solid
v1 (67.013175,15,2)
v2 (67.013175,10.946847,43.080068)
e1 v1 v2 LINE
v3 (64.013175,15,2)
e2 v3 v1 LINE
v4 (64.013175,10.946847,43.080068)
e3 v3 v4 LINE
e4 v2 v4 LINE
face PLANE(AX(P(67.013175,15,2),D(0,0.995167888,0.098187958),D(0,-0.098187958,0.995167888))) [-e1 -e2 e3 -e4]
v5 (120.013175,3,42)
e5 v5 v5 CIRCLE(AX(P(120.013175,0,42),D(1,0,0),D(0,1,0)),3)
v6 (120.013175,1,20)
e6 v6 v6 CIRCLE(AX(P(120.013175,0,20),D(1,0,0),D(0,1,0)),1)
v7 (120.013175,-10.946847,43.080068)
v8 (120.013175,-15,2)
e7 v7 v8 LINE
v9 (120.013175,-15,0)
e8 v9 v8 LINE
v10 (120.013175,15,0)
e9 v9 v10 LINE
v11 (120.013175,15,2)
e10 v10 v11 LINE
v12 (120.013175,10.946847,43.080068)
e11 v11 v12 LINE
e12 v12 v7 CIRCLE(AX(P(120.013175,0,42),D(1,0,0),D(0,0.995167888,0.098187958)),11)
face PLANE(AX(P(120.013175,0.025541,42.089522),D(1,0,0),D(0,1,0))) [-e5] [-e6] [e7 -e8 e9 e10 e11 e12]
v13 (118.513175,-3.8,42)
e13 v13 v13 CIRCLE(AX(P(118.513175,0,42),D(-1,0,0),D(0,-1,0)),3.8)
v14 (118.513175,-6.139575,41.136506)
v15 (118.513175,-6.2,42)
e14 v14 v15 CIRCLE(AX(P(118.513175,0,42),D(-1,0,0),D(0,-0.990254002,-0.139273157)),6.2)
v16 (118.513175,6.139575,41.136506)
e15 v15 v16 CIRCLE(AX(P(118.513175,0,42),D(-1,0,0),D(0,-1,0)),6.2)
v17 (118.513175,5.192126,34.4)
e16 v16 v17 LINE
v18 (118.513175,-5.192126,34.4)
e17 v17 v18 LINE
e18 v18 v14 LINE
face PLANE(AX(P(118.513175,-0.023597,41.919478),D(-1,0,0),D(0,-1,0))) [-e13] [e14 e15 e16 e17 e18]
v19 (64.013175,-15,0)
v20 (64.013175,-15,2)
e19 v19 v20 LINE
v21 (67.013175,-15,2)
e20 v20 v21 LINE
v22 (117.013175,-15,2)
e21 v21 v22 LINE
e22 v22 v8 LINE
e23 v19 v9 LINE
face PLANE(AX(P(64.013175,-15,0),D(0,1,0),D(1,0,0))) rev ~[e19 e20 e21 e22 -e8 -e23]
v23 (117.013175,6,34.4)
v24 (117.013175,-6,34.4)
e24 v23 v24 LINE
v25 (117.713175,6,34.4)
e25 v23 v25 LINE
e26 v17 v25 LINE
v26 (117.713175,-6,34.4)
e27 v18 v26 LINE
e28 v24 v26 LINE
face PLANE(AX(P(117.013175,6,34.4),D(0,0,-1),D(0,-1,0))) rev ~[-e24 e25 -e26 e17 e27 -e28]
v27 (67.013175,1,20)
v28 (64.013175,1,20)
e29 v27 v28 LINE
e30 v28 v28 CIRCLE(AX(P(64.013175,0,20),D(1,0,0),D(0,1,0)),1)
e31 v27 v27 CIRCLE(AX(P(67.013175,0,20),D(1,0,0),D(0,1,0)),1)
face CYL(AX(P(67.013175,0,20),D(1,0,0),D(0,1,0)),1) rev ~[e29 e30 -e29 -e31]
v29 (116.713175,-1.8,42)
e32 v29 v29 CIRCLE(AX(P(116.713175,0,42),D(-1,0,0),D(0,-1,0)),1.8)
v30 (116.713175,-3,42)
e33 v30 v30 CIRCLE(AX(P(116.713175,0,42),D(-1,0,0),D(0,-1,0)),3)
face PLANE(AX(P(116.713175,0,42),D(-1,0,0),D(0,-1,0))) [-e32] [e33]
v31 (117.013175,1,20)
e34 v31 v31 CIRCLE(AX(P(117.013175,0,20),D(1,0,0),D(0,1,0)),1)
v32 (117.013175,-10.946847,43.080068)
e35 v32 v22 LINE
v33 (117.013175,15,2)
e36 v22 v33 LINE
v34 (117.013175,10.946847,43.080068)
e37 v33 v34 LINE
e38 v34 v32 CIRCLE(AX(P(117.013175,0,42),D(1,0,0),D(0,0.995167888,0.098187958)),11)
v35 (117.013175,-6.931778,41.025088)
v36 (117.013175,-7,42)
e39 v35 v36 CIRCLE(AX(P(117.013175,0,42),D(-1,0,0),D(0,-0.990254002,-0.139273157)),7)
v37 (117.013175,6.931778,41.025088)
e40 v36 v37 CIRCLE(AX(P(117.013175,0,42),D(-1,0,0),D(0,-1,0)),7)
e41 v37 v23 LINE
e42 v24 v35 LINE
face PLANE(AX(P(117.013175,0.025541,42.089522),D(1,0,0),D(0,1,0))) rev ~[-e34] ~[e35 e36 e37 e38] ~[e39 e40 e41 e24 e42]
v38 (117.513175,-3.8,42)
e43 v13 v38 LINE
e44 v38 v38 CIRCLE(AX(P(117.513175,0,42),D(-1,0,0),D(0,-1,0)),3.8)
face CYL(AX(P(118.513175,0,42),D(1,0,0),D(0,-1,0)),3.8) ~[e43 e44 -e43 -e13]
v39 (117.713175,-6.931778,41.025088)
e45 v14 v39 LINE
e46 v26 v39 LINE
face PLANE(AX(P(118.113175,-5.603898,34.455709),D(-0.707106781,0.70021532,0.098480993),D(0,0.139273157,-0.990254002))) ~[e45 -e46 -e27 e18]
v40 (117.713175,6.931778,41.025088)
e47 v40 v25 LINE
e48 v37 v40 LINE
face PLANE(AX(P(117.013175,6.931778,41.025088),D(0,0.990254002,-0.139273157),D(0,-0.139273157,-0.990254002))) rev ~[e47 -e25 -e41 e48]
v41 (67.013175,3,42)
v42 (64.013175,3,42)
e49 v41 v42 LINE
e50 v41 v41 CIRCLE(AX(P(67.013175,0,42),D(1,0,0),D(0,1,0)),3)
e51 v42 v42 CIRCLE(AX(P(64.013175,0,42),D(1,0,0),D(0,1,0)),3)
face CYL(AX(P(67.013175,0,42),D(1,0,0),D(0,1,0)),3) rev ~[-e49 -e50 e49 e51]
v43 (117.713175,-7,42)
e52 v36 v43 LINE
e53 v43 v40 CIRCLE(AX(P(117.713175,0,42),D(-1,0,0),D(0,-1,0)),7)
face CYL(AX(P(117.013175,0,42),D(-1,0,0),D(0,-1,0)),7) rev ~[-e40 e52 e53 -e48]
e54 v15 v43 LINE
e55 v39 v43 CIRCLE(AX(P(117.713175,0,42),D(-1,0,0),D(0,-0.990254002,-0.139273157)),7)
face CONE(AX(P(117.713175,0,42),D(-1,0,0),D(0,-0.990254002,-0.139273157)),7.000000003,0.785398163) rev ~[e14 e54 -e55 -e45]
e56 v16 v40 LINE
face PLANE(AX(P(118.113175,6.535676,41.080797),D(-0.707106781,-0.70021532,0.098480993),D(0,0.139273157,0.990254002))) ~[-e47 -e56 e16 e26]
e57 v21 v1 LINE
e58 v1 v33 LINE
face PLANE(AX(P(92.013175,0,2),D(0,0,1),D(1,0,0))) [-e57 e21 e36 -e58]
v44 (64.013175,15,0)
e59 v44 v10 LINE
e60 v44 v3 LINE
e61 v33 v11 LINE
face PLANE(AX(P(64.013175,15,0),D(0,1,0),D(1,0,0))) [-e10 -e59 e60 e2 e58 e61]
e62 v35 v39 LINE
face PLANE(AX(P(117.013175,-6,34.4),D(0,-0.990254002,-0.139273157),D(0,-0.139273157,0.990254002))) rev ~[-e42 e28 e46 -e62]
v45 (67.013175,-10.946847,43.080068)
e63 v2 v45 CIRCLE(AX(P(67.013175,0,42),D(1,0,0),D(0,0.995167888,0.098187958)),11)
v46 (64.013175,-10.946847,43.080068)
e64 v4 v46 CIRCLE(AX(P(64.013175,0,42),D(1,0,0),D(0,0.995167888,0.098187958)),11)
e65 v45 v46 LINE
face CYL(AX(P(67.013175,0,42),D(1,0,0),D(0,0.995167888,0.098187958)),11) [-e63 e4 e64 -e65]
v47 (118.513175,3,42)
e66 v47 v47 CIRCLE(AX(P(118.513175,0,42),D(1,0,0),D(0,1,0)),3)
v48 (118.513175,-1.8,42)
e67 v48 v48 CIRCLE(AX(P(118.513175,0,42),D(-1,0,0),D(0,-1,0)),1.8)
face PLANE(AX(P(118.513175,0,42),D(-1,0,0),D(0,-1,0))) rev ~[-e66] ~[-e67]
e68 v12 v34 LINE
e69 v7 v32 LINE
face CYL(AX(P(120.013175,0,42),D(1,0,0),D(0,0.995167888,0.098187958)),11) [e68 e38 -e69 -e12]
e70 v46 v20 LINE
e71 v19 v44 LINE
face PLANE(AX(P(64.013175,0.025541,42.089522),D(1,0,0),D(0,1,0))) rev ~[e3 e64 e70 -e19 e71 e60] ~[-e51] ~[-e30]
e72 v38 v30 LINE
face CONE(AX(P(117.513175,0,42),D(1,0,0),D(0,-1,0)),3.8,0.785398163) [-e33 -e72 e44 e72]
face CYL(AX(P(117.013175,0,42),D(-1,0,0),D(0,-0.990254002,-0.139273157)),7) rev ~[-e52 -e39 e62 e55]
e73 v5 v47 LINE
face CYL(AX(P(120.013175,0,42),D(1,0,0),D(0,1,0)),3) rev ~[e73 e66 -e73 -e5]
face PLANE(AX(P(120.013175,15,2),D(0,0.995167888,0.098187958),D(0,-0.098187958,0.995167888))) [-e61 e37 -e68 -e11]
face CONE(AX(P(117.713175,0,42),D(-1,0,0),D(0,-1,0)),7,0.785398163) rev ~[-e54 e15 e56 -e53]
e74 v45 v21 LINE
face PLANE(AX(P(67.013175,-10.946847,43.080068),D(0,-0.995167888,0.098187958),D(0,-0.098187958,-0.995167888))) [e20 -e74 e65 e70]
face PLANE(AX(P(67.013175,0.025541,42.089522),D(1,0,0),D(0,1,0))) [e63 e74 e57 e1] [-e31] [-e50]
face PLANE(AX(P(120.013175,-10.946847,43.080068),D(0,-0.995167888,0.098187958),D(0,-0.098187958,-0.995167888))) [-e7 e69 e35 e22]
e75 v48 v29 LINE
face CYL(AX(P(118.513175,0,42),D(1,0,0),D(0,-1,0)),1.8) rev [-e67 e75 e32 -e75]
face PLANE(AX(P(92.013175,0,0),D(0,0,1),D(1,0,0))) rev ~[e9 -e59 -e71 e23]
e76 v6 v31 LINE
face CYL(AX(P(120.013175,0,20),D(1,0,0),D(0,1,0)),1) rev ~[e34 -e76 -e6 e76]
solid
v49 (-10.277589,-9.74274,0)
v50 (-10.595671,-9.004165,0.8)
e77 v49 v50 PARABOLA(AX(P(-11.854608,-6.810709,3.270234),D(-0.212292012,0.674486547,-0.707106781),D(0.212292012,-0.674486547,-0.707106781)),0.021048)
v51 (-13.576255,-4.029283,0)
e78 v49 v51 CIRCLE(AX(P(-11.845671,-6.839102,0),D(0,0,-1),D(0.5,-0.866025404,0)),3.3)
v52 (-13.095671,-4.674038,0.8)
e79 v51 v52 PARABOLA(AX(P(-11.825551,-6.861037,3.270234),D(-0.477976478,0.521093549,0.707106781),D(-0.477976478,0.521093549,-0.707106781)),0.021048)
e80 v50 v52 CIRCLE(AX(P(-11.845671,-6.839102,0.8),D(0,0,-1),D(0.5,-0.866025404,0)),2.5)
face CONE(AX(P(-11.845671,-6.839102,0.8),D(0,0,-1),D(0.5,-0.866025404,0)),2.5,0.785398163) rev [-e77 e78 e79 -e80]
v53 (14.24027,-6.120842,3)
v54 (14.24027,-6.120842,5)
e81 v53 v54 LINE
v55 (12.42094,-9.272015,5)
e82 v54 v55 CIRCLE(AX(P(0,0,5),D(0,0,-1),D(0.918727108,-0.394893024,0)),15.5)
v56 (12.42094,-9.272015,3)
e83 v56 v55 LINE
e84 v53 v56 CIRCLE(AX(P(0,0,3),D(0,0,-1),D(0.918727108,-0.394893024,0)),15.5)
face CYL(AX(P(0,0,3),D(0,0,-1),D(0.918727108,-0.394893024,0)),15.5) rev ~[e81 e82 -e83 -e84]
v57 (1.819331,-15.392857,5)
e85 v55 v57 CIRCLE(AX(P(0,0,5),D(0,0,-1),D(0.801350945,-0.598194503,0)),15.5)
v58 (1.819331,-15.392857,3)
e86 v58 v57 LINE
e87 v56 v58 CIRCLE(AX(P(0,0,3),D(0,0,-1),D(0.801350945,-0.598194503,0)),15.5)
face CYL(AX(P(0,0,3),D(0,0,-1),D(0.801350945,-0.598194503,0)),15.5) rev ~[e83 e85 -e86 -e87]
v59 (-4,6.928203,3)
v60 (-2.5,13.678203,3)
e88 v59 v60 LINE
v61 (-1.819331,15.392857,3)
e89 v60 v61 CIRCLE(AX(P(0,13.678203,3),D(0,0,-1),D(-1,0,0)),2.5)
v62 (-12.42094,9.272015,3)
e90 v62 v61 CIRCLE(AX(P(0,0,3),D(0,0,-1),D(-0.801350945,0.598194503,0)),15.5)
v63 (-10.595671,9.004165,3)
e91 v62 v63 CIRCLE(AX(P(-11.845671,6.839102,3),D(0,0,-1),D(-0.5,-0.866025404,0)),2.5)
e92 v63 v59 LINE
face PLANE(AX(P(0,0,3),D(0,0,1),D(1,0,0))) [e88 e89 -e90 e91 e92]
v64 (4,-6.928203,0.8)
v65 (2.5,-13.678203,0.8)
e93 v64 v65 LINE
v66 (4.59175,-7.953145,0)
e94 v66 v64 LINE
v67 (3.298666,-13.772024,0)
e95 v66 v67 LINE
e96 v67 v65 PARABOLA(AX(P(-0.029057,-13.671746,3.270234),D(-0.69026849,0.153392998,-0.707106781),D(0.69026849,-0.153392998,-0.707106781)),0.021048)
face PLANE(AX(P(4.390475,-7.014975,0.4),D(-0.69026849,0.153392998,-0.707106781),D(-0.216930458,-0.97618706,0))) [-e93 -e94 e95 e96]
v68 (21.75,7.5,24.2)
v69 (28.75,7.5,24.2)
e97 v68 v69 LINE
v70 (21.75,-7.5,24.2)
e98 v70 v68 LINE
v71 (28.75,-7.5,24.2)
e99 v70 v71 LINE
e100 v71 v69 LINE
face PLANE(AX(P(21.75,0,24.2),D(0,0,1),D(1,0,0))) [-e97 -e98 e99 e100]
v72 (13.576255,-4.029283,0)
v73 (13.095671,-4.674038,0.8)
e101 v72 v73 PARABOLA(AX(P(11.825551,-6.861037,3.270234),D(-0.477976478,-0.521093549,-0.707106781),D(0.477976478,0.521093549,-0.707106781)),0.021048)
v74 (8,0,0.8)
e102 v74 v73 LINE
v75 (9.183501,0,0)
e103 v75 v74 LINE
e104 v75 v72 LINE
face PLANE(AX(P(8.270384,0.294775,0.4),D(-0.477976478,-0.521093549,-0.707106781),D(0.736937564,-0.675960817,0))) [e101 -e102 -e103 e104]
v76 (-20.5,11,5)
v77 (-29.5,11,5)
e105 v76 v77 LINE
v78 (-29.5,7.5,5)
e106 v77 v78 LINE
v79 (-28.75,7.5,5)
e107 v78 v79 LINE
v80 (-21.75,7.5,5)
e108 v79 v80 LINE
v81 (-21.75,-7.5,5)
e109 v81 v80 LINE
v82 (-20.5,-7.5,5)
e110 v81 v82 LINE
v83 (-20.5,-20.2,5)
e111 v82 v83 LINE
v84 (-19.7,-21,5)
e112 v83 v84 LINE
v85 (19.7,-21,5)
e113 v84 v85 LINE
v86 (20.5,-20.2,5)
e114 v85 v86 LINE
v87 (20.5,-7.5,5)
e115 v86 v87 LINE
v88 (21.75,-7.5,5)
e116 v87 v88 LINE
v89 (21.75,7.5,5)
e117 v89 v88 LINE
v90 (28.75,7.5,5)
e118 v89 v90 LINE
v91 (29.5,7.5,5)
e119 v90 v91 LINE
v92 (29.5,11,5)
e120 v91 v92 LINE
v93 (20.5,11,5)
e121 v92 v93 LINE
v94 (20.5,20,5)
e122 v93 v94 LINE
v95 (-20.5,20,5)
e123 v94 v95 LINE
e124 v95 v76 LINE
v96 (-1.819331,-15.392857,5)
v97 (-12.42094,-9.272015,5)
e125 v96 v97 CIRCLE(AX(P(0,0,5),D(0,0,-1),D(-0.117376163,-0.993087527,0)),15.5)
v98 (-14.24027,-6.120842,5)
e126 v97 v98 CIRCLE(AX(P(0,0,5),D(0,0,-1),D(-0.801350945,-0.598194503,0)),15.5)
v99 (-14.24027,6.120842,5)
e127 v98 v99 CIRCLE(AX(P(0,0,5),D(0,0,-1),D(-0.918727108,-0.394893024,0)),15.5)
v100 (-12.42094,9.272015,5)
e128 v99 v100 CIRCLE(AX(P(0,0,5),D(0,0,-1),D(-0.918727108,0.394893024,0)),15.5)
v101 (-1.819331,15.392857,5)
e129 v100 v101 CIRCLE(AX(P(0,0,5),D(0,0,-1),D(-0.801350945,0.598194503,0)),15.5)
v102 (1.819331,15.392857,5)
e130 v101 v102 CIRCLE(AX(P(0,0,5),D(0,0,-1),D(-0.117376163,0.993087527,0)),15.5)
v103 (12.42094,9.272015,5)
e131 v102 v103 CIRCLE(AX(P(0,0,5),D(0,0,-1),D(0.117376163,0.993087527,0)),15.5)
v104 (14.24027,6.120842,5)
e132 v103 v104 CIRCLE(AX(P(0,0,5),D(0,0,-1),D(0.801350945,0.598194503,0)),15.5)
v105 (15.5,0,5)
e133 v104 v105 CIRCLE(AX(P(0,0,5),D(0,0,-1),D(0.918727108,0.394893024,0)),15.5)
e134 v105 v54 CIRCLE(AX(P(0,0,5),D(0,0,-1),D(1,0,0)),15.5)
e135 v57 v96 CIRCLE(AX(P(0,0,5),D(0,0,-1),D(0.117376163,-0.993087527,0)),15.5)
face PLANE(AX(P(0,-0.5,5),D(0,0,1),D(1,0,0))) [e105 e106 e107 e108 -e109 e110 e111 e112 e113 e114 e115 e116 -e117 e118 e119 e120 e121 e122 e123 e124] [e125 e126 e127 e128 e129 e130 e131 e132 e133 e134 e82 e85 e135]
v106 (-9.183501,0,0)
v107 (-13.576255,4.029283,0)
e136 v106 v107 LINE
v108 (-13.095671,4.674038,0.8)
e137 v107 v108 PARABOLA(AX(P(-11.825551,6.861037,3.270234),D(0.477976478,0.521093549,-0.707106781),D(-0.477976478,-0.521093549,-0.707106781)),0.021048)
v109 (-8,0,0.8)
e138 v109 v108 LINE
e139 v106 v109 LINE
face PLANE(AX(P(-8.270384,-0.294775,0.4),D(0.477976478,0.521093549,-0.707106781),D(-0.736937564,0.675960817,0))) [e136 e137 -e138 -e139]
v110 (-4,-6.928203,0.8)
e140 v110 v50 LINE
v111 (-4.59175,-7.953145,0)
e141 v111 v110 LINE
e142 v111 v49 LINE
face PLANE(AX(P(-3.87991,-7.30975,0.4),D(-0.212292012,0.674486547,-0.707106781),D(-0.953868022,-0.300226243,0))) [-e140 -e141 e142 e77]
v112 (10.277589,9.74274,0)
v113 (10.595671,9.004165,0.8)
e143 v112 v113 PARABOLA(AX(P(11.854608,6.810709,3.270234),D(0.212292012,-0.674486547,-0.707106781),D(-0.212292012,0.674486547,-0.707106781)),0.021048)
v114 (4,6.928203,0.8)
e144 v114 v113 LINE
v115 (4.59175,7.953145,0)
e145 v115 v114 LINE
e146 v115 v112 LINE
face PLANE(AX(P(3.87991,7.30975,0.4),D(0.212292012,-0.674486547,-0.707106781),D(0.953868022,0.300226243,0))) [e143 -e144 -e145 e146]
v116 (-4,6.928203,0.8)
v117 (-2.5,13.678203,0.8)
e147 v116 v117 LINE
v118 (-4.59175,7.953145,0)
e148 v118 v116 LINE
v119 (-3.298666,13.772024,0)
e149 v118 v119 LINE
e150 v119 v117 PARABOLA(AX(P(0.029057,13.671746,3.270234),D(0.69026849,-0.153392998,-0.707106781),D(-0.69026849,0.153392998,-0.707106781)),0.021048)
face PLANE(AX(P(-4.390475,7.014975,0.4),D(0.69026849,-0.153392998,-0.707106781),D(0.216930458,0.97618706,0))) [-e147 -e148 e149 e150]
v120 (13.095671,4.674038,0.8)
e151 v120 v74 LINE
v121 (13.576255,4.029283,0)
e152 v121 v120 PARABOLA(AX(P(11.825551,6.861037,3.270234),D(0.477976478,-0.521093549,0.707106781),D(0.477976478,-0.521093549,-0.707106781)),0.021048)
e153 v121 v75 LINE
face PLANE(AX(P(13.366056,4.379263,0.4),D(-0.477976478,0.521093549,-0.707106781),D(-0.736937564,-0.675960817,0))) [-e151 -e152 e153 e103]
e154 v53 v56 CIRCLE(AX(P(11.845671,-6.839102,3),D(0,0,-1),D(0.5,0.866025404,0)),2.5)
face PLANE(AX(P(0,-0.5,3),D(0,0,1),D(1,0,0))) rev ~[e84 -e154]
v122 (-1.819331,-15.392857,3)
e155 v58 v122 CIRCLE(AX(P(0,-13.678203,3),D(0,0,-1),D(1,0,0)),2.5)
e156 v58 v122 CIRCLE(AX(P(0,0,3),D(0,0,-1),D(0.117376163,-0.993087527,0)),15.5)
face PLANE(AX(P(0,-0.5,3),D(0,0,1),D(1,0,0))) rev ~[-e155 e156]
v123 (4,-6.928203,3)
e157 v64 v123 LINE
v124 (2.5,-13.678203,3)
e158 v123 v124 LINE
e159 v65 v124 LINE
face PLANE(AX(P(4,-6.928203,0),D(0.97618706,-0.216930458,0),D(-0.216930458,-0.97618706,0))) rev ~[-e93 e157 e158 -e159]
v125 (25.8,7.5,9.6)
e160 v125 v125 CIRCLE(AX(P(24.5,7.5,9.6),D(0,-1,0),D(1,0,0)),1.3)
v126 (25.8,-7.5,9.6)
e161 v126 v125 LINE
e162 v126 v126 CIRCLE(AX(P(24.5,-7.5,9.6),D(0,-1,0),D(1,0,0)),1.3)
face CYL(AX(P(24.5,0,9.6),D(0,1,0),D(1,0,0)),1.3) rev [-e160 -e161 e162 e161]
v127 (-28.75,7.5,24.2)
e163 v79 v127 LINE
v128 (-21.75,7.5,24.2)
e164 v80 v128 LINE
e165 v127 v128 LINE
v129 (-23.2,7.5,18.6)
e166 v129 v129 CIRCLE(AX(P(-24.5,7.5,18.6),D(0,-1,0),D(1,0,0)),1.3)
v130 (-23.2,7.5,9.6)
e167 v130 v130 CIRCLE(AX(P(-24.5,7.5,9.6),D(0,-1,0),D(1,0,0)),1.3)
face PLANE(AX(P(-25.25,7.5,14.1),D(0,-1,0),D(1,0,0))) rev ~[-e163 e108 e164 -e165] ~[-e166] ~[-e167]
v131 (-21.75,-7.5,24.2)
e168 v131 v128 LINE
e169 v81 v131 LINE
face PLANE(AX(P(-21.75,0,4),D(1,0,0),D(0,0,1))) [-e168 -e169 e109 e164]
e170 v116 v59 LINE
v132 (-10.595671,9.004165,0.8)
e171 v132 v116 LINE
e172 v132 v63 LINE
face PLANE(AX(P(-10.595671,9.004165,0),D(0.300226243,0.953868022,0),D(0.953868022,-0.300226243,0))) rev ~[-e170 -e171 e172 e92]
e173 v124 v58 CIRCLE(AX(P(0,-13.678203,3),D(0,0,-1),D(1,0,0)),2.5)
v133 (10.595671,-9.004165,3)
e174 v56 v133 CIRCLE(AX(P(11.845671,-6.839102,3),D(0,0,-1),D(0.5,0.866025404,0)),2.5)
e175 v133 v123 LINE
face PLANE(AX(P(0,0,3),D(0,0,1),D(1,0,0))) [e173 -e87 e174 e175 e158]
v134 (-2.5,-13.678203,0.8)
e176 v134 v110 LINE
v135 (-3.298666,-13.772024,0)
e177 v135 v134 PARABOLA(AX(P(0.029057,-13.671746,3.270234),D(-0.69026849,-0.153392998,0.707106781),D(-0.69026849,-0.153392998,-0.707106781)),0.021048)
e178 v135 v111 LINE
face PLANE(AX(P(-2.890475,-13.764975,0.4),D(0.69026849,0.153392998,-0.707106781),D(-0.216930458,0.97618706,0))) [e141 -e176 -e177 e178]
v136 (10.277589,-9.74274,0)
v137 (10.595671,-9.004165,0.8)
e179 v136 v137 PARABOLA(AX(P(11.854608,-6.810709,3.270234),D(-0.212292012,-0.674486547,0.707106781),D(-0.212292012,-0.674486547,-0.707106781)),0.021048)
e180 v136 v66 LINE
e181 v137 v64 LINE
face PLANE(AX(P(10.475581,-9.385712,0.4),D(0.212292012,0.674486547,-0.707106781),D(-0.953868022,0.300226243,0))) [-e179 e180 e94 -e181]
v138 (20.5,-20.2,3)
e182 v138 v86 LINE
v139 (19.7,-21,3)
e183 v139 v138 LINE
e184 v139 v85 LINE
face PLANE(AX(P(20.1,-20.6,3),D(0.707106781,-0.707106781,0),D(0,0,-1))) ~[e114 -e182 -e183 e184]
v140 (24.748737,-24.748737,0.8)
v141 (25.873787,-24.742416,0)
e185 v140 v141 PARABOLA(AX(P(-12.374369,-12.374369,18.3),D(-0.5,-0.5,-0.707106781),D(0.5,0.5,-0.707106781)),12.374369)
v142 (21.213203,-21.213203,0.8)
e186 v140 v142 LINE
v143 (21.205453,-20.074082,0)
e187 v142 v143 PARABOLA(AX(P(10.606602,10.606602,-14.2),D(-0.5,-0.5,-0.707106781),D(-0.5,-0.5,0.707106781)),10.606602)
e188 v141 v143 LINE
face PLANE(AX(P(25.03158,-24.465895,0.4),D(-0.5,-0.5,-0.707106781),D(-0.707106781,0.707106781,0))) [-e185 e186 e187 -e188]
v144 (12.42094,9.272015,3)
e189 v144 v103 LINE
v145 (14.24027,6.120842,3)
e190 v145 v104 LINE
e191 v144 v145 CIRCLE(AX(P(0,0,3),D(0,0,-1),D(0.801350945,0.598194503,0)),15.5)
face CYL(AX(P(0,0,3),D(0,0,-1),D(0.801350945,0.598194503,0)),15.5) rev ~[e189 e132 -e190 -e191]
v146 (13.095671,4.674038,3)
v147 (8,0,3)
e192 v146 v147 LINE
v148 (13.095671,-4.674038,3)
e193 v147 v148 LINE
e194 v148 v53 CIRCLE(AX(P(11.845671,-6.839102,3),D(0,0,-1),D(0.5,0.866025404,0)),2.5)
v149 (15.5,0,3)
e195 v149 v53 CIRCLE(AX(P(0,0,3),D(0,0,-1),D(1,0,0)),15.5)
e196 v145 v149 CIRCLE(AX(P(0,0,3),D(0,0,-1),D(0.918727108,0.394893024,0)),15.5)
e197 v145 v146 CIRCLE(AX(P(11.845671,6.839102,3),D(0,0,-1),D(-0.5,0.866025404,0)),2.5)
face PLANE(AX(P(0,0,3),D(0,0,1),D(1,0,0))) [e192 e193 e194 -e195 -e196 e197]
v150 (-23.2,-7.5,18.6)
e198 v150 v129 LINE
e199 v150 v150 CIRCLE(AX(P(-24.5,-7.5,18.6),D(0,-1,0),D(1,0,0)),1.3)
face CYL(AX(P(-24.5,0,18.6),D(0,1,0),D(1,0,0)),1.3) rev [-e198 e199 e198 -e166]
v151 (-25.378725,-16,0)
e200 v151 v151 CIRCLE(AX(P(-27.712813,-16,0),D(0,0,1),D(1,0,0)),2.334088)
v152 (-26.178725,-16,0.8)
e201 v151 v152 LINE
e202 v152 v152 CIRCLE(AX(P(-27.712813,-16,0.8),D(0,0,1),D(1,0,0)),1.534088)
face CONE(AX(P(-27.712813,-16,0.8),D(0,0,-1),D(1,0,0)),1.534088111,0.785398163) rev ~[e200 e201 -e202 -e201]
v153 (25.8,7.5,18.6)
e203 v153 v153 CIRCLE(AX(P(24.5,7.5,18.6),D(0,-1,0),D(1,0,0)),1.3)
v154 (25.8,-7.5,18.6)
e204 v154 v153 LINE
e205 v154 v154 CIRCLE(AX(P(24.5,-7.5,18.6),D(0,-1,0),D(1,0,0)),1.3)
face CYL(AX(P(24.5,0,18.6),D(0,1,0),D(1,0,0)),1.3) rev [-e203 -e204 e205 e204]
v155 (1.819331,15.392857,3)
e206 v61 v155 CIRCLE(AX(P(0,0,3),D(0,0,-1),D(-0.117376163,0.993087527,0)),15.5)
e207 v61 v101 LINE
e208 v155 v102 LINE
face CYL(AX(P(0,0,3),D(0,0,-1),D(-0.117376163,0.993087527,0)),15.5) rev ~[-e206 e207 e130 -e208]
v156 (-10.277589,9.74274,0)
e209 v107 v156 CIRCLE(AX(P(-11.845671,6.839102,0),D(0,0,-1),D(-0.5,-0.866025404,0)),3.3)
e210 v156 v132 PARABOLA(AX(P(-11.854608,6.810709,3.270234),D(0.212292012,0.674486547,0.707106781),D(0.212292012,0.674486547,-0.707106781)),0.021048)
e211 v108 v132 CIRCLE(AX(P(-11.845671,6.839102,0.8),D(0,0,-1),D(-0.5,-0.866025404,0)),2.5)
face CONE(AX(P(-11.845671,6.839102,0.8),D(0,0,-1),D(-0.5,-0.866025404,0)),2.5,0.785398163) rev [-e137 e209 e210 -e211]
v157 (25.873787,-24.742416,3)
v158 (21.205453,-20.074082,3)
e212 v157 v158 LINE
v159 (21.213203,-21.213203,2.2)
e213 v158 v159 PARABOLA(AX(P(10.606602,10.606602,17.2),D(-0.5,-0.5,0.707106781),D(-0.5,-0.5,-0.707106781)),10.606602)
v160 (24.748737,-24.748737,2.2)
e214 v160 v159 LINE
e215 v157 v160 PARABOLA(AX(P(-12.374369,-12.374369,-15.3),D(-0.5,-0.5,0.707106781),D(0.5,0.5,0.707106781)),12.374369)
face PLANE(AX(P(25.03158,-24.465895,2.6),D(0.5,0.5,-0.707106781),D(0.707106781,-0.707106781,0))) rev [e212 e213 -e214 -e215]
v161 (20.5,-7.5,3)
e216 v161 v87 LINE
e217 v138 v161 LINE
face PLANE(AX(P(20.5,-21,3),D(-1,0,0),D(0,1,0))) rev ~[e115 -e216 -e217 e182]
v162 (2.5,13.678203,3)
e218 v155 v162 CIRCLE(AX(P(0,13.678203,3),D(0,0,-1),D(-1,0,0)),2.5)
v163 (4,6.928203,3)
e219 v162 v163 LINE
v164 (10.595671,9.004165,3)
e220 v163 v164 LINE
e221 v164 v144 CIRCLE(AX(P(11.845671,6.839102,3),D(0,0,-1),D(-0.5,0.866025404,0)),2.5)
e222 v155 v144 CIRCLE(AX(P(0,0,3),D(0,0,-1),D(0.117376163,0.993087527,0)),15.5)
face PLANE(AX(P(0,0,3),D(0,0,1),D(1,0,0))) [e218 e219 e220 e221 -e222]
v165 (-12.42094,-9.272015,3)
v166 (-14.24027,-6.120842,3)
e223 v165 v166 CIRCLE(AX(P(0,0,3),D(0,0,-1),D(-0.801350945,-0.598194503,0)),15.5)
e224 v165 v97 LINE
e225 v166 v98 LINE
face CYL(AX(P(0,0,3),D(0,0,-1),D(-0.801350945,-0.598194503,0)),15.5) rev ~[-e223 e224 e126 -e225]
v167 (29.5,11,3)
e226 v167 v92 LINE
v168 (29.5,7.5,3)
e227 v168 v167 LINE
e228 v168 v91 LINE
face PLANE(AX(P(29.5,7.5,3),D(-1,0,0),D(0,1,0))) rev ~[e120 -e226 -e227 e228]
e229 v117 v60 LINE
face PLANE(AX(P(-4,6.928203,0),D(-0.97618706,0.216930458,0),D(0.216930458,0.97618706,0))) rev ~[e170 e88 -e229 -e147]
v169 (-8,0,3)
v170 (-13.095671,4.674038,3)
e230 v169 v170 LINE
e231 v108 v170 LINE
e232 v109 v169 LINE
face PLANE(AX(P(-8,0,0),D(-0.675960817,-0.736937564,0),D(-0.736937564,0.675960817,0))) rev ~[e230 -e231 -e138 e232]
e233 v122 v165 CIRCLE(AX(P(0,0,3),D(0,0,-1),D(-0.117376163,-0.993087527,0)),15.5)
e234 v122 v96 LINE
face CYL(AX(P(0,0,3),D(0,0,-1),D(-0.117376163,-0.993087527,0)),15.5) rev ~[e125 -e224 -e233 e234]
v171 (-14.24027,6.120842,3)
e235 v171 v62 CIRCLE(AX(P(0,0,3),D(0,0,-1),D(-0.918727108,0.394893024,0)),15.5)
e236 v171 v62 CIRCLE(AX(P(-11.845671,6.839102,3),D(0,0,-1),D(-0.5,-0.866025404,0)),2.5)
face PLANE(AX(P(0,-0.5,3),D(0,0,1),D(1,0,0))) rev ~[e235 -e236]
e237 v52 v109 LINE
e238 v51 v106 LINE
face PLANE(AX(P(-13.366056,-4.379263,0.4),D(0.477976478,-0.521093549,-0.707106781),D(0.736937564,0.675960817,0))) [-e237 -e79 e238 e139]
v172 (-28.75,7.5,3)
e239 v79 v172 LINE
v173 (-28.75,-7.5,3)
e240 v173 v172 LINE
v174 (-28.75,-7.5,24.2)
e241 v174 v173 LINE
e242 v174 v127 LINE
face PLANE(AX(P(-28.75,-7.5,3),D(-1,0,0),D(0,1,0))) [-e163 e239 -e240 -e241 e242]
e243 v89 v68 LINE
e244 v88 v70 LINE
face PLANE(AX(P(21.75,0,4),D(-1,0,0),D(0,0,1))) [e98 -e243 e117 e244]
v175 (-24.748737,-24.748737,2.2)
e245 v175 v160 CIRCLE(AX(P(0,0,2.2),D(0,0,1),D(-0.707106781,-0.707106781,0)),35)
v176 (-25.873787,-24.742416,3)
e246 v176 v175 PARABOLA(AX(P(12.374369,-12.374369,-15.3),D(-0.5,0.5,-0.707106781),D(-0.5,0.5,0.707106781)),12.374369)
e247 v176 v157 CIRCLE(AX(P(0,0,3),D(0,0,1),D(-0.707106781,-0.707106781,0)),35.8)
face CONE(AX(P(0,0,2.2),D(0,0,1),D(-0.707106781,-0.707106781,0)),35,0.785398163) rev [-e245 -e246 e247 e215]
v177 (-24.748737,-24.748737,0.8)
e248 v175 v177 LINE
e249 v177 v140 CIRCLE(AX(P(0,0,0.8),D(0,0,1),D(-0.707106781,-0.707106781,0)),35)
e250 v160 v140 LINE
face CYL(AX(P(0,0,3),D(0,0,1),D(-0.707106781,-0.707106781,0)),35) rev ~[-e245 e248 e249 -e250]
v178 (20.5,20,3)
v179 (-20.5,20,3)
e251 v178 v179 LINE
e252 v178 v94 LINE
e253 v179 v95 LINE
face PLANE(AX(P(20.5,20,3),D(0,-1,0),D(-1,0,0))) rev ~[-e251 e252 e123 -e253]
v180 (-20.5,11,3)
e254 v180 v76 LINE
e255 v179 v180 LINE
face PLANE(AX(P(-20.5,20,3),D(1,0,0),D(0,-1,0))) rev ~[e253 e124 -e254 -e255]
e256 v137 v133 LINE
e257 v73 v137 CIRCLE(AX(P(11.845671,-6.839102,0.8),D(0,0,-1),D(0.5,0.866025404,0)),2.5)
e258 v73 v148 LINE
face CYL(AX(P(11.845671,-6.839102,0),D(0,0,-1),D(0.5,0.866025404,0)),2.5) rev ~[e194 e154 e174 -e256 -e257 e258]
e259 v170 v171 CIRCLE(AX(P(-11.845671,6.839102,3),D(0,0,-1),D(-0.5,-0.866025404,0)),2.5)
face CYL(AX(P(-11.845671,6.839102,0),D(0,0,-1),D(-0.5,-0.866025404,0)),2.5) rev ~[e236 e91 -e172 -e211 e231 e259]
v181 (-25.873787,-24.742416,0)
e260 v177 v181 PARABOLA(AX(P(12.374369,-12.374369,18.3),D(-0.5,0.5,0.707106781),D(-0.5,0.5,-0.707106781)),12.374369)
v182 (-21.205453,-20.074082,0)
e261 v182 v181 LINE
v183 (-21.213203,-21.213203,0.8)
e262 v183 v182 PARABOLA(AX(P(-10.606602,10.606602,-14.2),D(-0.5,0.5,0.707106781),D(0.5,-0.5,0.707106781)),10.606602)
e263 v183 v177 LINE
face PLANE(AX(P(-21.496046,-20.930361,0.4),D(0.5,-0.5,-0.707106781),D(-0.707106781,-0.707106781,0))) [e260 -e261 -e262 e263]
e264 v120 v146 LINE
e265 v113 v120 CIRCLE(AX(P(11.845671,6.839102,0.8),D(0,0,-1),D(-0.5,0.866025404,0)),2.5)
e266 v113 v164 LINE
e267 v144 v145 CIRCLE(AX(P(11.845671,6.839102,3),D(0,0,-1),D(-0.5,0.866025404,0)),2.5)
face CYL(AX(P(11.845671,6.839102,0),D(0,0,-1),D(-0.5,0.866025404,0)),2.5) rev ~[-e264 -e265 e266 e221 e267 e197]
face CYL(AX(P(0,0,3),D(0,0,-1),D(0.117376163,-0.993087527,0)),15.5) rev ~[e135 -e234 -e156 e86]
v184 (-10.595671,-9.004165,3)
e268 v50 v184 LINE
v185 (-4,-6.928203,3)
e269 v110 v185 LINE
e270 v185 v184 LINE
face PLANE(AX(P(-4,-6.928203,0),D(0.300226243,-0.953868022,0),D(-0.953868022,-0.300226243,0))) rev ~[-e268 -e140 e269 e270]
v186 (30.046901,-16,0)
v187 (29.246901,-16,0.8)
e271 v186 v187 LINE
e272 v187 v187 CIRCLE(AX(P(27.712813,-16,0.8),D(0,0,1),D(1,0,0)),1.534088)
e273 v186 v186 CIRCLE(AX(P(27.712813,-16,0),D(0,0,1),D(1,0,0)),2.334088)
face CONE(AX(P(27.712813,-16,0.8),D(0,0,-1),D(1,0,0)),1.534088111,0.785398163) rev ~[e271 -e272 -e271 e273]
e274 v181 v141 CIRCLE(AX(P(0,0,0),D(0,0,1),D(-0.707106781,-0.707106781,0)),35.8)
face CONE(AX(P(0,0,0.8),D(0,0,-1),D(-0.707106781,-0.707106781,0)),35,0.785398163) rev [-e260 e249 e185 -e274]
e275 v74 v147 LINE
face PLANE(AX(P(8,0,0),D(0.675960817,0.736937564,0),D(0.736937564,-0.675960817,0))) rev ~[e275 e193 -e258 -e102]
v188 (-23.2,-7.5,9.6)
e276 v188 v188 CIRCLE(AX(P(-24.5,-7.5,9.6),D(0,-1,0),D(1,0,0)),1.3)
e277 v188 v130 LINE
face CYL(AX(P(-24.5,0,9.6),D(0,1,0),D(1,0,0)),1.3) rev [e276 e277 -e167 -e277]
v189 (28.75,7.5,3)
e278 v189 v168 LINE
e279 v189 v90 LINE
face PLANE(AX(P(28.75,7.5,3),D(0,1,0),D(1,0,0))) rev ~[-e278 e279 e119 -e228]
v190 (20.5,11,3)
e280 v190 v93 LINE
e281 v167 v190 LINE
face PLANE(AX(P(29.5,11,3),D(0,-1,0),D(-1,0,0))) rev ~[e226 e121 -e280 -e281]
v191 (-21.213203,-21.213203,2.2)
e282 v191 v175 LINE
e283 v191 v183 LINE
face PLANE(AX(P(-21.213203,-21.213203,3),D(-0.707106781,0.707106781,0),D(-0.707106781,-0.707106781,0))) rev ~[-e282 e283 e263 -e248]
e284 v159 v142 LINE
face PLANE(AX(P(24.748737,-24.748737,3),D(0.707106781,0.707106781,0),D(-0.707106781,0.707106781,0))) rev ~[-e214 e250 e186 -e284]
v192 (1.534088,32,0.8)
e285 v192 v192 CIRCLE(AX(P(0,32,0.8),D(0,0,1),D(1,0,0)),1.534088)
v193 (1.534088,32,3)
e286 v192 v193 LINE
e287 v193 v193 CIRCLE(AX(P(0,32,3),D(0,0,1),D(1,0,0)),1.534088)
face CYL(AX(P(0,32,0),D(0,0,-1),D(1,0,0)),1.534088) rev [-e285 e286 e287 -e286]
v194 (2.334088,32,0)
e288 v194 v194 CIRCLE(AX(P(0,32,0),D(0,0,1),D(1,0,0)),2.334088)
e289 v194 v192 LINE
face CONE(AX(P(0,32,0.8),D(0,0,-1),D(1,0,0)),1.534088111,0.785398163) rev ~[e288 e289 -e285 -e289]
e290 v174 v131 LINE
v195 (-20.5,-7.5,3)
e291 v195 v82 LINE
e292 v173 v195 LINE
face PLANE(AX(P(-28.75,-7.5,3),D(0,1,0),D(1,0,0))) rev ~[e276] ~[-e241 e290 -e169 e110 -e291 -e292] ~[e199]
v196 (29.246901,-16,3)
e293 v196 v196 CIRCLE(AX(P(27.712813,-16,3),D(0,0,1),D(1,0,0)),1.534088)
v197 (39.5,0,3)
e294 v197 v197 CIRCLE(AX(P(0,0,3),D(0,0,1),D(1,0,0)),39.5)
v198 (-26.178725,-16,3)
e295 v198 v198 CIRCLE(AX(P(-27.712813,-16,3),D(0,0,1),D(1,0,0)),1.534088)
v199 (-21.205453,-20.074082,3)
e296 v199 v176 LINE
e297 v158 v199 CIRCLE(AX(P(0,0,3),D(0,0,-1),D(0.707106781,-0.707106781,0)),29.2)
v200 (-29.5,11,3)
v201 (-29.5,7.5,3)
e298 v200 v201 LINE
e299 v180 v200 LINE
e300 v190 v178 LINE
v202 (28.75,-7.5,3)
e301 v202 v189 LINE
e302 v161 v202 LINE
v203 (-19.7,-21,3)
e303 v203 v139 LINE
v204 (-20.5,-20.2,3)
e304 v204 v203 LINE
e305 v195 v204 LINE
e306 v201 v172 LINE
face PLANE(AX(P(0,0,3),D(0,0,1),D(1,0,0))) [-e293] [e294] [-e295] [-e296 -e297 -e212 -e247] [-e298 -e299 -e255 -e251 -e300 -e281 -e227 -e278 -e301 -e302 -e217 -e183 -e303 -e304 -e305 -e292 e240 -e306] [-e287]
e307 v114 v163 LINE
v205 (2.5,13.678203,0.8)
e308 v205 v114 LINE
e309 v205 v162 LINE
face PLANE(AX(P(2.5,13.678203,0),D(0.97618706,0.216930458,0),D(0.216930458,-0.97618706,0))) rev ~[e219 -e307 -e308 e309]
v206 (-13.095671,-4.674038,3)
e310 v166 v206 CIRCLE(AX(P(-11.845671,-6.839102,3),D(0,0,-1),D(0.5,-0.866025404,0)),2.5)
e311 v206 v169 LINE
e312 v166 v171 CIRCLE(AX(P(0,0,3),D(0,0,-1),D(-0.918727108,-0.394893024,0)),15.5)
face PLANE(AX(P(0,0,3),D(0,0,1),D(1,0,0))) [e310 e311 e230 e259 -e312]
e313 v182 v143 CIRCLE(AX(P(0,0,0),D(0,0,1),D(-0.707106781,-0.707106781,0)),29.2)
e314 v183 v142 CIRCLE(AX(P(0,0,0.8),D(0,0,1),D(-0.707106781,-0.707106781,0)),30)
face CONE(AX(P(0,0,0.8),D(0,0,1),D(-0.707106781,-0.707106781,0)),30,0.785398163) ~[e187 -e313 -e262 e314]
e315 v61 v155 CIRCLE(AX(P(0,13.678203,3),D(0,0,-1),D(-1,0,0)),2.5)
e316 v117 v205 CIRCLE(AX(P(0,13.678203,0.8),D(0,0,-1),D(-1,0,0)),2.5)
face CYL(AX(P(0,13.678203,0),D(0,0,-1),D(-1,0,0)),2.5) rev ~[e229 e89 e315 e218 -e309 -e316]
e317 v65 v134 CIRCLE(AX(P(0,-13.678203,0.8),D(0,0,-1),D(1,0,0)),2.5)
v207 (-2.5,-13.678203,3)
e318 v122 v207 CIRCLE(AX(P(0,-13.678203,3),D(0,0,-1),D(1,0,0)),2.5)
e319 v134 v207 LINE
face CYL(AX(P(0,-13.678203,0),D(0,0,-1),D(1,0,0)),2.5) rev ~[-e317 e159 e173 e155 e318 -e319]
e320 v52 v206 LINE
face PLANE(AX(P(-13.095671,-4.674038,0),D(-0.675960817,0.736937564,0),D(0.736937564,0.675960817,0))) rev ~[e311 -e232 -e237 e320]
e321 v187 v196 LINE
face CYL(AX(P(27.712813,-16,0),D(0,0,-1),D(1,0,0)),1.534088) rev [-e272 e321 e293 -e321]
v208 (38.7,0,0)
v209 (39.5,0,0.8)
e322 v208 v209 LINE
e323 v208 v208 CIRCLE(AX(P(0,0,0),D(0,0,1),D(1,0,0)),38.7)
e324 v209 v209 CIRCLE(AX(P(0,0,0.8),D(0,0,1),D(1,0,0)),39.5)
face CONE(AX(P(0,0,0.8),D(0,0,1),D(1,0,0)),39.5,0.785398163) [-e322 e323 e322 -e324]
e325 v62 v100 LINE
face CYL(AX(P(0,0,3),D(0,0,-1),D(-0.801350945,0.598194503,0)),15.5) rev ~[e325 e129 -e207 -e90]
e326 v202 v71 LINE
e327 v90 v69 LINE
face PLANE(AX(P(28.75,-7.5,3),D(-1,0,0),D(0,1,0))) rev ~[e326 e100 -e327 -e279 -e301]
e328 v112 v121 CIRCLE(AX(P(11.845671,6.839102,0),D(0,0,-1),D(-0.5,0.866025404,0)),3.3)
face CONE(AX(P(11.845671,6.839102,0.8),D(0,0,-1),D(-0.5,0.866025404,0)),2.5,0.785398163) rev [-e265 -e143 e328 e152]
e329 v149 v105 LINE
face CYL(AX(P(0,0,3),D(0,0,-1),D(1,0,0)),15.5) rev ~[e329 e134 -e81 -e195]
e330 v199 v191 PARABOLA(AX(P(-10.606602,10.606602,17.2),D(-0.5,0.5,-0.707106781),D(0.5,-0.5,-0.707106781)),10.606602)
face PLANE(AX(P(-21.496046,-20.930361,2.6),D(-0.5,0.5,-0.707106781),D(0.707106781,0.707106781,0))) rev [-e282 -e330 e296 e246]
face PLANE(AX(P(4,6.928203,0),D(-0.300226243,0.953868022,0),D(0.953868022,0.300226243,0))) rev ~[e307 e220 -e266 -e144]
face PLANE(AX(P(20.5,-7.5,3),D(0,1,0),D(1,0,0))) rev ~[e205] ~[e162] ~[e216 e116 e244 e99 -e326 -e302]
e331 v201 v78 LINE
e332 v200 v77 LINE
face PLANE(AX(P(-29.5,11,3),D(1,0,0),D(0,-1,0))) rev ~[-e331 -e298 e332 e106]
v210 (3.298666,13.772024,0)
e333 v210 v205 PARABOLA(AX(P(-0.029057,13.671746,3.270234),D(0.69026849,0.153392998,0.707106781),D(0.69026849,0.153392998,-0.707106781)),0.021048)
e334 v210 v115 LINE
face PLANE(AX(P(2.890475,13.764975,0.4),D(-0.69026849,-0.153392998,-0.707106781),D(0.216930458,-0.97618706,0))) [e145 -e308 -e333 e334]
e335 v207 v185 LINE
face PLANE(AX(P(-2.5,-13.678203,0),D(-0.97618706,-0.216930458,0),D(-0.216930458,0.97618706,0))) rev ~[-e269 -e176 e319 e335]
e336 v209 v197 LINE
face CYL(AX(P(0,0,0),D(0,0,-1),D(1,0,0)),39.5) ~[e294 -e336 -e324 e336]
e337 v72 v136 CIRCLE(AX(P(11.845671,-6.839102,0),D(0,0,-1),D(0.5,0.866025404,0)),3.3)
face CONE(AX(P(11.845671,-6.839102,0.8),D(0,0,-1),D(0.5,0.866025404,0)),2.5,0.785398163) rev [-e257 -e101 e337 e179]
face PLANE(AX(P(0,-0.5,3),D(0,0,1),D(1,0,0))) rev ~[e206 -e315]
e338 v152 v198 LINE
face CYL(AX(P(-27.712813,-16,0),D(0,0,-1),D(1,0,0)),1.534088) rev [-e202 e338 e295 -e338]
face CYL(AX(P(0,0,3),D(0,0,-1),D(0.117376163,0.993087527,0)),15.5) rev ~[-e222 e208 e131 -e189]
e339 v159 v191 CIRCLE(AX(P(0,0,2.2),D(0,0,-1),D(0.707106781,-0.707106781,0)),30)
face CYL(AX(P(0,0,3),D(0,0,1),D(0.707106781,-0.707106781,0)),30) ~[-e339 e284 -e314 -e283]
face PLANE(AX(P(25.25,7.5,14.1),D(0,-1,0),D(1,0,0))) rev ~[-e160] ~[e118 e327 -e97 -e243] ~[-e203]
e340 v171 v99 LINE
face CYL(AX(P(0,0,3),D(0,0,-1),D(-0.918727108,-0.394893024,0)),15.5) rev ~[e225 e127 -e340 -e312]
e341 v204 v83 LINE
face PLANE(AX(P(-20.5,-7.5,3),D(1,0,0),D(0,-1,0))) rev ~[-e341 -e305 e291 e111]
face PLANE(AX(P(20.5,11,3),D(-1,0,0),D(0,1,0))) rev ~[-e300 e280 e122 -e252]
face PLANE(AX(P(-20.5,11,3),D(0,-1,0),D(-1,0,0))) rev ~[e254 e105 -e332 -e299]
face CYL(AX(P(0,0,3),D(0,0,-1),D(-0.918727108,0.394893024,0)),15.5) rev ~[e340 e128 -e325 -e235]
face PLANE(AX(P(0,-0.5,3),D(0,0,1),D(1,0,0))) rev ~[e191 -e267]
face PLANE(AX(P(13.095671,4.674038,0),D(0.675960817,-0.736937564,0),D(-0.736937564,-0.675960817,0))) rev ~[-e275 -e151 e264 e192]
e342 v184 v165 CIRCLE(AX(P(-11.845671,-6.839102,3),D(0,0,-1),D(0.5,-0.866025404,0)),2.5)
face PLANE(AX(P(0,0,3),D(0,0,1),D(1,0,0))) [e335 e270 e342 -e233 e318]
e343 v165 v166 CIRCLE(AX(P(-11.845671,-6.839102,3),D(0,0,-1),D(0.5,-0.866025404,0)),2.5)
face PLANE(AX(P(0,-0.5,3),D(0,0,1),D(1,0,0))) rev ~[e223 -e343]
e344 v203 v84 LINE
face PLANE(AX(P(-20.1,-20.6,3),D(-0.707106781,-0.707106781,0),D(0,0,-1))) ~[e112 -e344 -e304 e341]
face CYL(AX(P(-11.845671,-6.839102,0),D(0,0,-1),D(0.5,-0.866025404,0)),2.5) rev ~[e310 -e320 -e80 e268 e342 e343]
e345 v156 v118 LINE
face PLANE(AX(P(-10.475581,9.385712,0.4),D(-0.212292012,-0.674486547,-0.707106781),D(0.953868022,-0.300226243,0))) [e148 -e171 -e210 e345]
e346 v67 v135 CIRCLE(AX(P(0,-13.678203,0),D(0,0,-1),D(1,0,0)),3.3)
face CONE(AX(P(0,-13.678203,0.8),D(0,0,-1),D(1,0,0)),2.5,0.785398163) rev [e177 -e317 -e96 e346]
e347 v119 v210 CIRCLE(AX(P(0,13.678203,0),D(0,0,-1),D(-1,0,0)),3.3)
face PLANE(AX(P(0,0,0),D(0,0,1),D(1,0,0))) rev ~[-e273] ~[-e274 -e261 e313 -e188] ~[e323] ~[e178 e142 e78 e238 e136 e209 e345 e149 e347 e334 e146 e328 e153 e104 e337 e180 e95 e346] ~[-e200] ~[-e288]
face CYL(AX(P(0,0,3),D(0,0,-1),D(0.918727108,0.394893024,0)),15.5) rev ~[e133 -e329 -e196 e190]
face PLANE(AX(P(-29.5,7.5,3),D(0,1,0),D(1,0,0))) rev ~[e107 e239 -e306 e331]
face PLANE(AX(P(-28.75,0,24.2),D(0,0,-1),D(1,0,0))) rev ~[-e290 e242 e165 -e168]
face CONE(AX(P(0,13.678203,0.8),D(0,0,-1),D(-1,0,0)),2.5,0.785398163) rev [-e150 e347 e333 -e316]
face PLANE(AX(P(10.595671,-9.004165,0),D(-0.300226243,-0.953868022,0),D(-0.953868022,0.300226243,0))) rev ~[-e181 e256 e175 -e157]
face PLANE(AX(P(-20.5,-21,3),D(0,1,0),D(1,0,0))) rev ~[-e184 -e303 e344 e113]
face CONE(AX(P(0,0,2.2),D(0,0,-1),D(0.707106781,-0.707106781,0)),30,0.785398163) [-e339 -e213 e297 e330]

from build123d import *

# Parameters (mm, degrees)
F0_R      = 39.5
F0_R_2    = 1.5340881109
F1_DEPTH  = 3
F2_W      = 8.25
F2_H      = 15
F3_DEPTH  = 2
F4_W      = 7
F4_H      = 20.2
F4_R      = 1.3
F5_DEPTH  = 7.5
F6_W      = 56
F6_H      = 30
F7_DEPTH  = 2
F8_R      = 3
F8_R_2    = 1
F9_DEPTH  = 3
F13_DEPTH = 1.5
F14_R     = 3.8
F14_R_2   = 1.8
F15_DEPTH = 1.8
F16_SIZE  = 0.8
F18_DEPTH = 25
F19_SIZE  = 0.8


with BuildPart() as f1:
    # F0 (on Top) → F1 (new body)
    with BuildSketch(Plane.XY):
        Circle(F0_R)
        with Locations((-27.7128129211, -16)):
            Circle(F0_R_2, mode=Mode.SUBTRACT)
        with Locations((27.7128129211, -16)):
            Circle(F0_R_2, mode=Mode.SUBTRACT)
        with BuildLine():
            ThreePointArc((-2.5, 13.6782032303), (0, 16.1782032303), (2.5, 13.6782032303))
            Line((2.5, 13.6782032303), (4, 6.9282032303))
            Line((4, 6.9282032303), (10.5956714755, 9.0041651246))
            ThreePointArc((10.5956714755, 9.0041651246), (14.010734985, 8.0891016151), (13.0956714755, 4.6740381057))
            Line((13.0956714755, 4.6740381057), (8, 0))
            Line((8, 0), (13.0956714755, -4.6740381057))
            ThreePointArc((13.0956714755, -4.6740381057), (14.010734985, -8.0891016151), (10.5956714755, -9.0041651246))
            Line((10.5956714755, -9.0041651246), (4, -6.9282032303))
            Line((4, -6.9282032303), (2.5, -13.6782032303))
            ThreePointArc((2.5, -13.6782032303), (0, -16.1782032303), (-2.5, -13.6782032303))
            Line((-2.5, -13.6782032303), (-4, -6.9282032303))
            Line((-4, -6.9282032303), (-10.5956714755, -9.0041651246))
            ThreePointArc((-10.5956714755, -9.0041651246), (-14.010734985, -8.0891016151), (-13.0956714755, -4.6740381057))
            Line((-13.0956714755, -4.6740381057), (-8, 0))
            Line((-8, 0), (-13.0956714755, 4.6740381057))
            ThreePointArc((-13.0956714755, 4.6740381057), (-14.010734985, 8.0891016151), (-10.5956714755, 9.0041651246))
            Line((-10.5956714755, 9.0041651246), (-4, 6.9282032303))
            Line((-4, 6.9282032303), (-2.5, 13.6782032303))
        make_face(mode=Mode.SUBTRACT)
        with Locations((0, 32)):
            Circle(F0_R_2, mode=Mode.SUBTRACT)
    extrude(amount=F1_DEPTH)

    # F2 (on face) → F3 (join)
    with BuildSketch(Plane.XY.offset(3)):
        Polygon((-20.5, -21), (20.5, -21), (20.5, -7.5), (20.5, 7.5), (20.5, 11), (20.5, 20), (-20.5, 20), (-20.5, 11), (-20.5, 7.5), (-20.5, -7.5), align=None)
        with BuildLine():
            ThreePointArc((14.240270178, 6.120841875), (15.1818014043, 3.124564949), (15.5, 0))
            ThreePointArc((15.5, 0), (15.1818014043, -3.124564949), (14.240270178, -6.120841875))
            ThreePointArc((14.240270178, -6.120841875), (14.010734985, -8.0891016151), (12.4209396453, -9.2720147934))
            ThreePointArc((12.4209396453, -9.2720147934), (7.75, -13.4233937587), (1.8193305327, -15.3928566684))
            ThreePointArc((1.8193305327, -15.3928566684), (0, -16.1782032303), (-1.8193305327, -15.3928566684))
            ThreePointArc((-1.8193305327, -15.3928566684), (-7.75, -13.4233937587), (-12.4209396453, -9.2720147934))
            ThreePointArc((-12.4209396453, -9.2720147934), (-14.010734985, -8.0891016151), (-14.240270178, -6.120841875))
            ThreePointArc((-14.240270178, -6.120841875), (-15.5, 0), (-14.240270178, 6.120841875))
            ThreePointArc((-14.240270178, 6.120841875), (-14.010734985, 8.0891016151), (-12.4209396453, 9.2720147934))
            ThreePointArc((-12.4209396453, 9.2720147934), (-7.75, 13.4233937587), (-1.8193305327, 15.3928566684))
            ThreePointArc((-1.8193305327, 15.3928566684), (0, 16.1782032303), (1.8193305327, 15.3928566684))
            ThreePointArc((1.8193305327, 15.3928566684), (7.75, 13.4233937587), (12.4209396453, 9.2720147934))
            ThreePointArc((12.4209396453, 9.2720147934), (14.010734985, 8.0891016151), (14.240270178, 6.120841875))
        make_face(mode=Mode.SUBTRACT)
        with Locations((24.625, 0)):
            Rectangle(F2_W, F2_H)
        with Locations((-24.625, 0)):
            Rectangle(F2_W, F2_H)
        Polygon((20.5, 11), (20.5, 7.5), (28.75, 7.5), (29.5, 7.5), (29.5, 11), align=None)
        Polygon((-28.75, 7.5), (-20.5, 7.5), (-20.5, 11), (-29.5, 11), (-29.5, 7.5), align=None)
        with BuildLine():
            ThreePointArc((12.4209396453, 9.2720147934), (13.4233937587, 7.75), (14.240270178, 6.120841875))
            ThreePointArc((14.240270178, 6.120841875), (14.010734985, 8.0891016151), (12.4209396453, 9.2720147934))
        make_face()
        with BuildLine():
            ThreePointArc((12.4209396453, -9.2720147934), (14.010734985, -8.0891016151), (14.240270178, -6.120841875))
            ThreePointArc((14.240270178, -6.120841875), (13.4233937587, -7.75), (12.4209396453, -9.2720147934))
        make_face()
        with BuildLine():
            ThreePointArc((-1.8193305327, 15.3928566684), (0, 15.5), (1.8193305327, 15.3928566684))
            ThreePointArc((1.8193305327, 15.3928566684), (0, 16.1782032303), (-1.8193305327, 15.3928566684))
        make_face()
        with BuildLine():
            ThreePointArc((-1.8193305327, -15.3928566684), (0, -16.1782032303), (1.8193305327, -15.3928566684))
            ThreePointArc((1.8193305327, -15.3928566684), (0, -15.5), (-1.8193305327, -15.3928566684))
        make_face()
        with BuildLine():
            ThreePointArc((-14.240270178, 6.120841875), (-13.4233937587, 7.75), (-12.4209396453, 9.2720147934))
            ThreePointArc((-12.4209396453, 9.2720147934), (-14.010734985, 8.0891016151), (-14.240270178, 6.120841875))
        make_face()
        with BuildLine():
            ThreePointArc((-14.240270178, -6.120841875), (-14.010734985, -8.0891016151), (-12.4209396453, -9.2720147934))
            ThreePointArc((-12.4209396453, -9.2720147934), (-13.4233937587, -7.75), (-14.240270178, -6.120841875))
        make_face()
    extrude(amount=F3_DEPTH)

    # F4 (on Front) → F5 (join, symmetric)
    with BuildSketch(Plane.XZ):
        with Locations((25.25, 14.1)):
            Rectangle(F4_W, F4_H)
        with Locations((24.5, 9.6)):
            Circle(F4_R, mode=Mode.SUBTRACT)
        with Locations((24.5, 18.6)):
            Circle(F4_R, mode=Mode.SUBTRACT)
        with Locations((-25.25, 14.1)):
            Rectangle(F4_W, F4_H)
        with Locations((-24.5, 9.6)):
            Circle(F4_R, mode=Mode.SUBTRACT)
        with Locations((-24.5, 18.6)):
            Circle(F4_R, mode=Mode.SUBTRACT)
    extrude(amount=F5_DEPTH, both=True)

    # F17 (on face) → F18 (cut)
    with BuildSketch(Plane.XY.offset(3)):
        with BuildLine():
            Line((-21.2132034356, -21.2132034356), (-24.7487373415, -24.7487373415))
            ThreePointArc((-24.7487373415, -24.7487373415), (0, -35), (24.7487373415, -24.7487373415))
            Line((24.7487373415, -24.7487373415), (21.2132034356, -21.2132034356))
            ThreePointArc((21.2132034356, -21.2132034356), (0, -30), (-21.2132034356, -21.2132034356))
        make_face()
    extrude(amount=-F18_DEPTH, mode=Mode.SUBTRACT)

    # F19 (call 1 of 9: OpenCascade refuses the feature's edges together)
    f19_edges = [f1.edges().sort_by_distance(p)[0] for p in [
        (-20.5, -21, 4),
    ]]
    chamfer(f19_edges, length=F19_SIZE)

    # F19#2 (call 2 of 9)
    f19_2_edges = [f1.edges().sort_by_distance(p)[0] for p in [
        (20.5, -21, 4),
    ]]
    chamfer(f19_2_edges, length=F19_SIZE)

    # F19#3 (call 3 of 9)
    f19_3_edges = [f1.edges().sort_by_distance(p)[0] for p in [
        (0, -30, 3),
        (-22.98097, -22.98097, 3),
        (0, -35, 3),
        (22.98097, -22.98097, 3),
    ]]
    chamfer(f19_3_edges, length=F19_SIZE)

    # F19#4 (call 4 of 9)
    f19_4_edges = [f1.edges().sort_by_distance(p)[0] for p in [
        (0, -30, 0),
        (-22.98097, -22.98097, 0),
        (0, -35, 0),
        (22.98097, -22.98097, 0),
    ]]
    chamfer(f19_4_edges, length=F19_SIZE)

    # F19#5 (call 5 of 9)
    f19_5_edges = [f1.edges().sort_by_distance(p)[0] for p in [
        (-39.5, 0, 0),
    ]]
    chamfer(f19_5_edges, length=F19_SIZE)

    # F19#6 (call 6 of 9)
    f19_6_edges = [f1.edges().sort_by_distance(p)[0] for p in [
        (-29.246901, -16, 0),
    ]]
    chamfer(f19_6_edges, length=F19_SIZE)

    # F19#7 (call 7 of 9)
    f19_7_edges = [f1.edges().sort_by_distance(p)[0] for p in [
        (26.178725, -16, 0),
    ]]
    chamfer(f19_7_edges, length=F19_SIZE)

    # F19#8 (call 8 of 9)
    f19_8_edges = [f1.edges().sort_by_distance(p)[0] for p in [
        (-14.010735, -8.089102, 0),
        (-7.297836, -7.966184, 0),
        (-10.547836, -2.337019, 0),
        (-3.25, -10.303203, 0),
        (-10.547836, 2.337019, 0),
        (0, -16.178203, 0),
        (-14.010735, 8.089102, 0),
        (3.25, -10.303203, 0),
        (-7.297836, 7.966184, 0),
        (7.297836, -7.966184, 0),
        (-3.25, 10.303203, 0),
        (14.010735, -8.089102, 0),
        (0, 16.178203, 0),
        (10.547836, -2.337019, 0),
        (3.25, 10.303203, 0),
        (10.547836, 2.337019, 0),
        (7.297836, 7.966184, 0),
        (14.010735, 8.089102, 0),
    ]]
    chamfer(f19_8_edges, length=F19_SIZE)

    # F19#9 (call 9 of 9)
    f19_9_edges = [f1.edges().sort_by_distance(p)[0] for p in [
        (-1.534088, 32, 0),
    ]]
    chamfer(f19_9_edges, length=F19_SIZE)


with BuildPart() as f7:
    # F6 (on Top) → F7 (new body)
    with BuildSketch(Plane.XY):
        with Locations((92.0131745475, 0)):
            Rectangle(F6_W, F6_H)
    extrude(amount=F7_DEPTH)


with BuildPart() as f9:
    # F8 (on face) → F9 (new body)
    with BuildSketch(Plane.YZ.offset(120.0131745475)):
        with BuildLine():
            ThreePointArc((-10.9468467659, 43.0800675372), (-0.5406873291, 31.0132963446), (11, 42))
            ThreePointArc((11, 42), (10.9867036554, 42.5406873291), (10.9468467659, 43.0800675372))
            ThreePointArc((10.9468467659, 43.0800675372), (0, 53), (-10.9468467659, 43.0800675372))
        make_face()
        with Locations((0, 42)):
            Circle(F8_R, mode=Mode.SUBTRACT)
        with BuildLine():
            ThreePointArc((10.9468467659, 43.0800675372), (10.9867036554, 42.5406873291), (11, 42))
            ThreePointArc((11, 42), (-0.5406873291, 31.0132963446), (-10.9468467659, 43.0800675372))
            Line((-10.9468467659, 43.0800675372), (-15, 2))
            Line((-15, 2), (0, 2))
            Line((0, 2), (15, 2))
            Line((15, 2), (10.9468467659, 43.0800675372))
        make_face()
        with Locations((0, 20)):
            Circle(F8_R_2, mode=Mode.SUBTRACT)
    extrude(amount=-F9_DEPTH)


with BuildPart() as f10_1:
    # F10: copy of F9
    add(f9.part.moved(Location((-53, 0, 0))))


with BuildPart() as f7_1:
    add(f7.part)

    # F11: union F9, F10_1
    add(f9.part)
    add(f10_1.part)

    # F12 (on face) → F13 (cut)
    with BuildSketch(Plane(origin=(117.0131745475, 0, 0), x_dir=(0, -1, 0), z_dir=(-1, 0, 0))):
        with BuildLine():
            ThreePointArc((6.9317780118, 41.0250879041), (6.9829236743, 41.5113519072), (7, 42))
            ThreePointArc((7, 42), (-0.4886480928, 48.9829236743), (-6.9317780118, 41.0250879041))
            ThreePointArc((-6.9317780118, 41.0250879041), (0, 35), (6.9317780118, 41.0250879041))
        make_face()
        with BuildLine():
            ThreePointArc((6.9317780118, 41.0250879041), (0, 35), (-6.9317780118, 41.0250879041))
            Line((-6.9317780118, 41.0250879041), (-6, 34.4))
            Line((-6, 34.4), (0, 34.4))
            Line((0, 34.4), (6, 34.4))
            Line((6, 34.4), (6.9317780118, 41.0250879041))
        make_face()
    extrude(amount=-F13_DEPTH, mode=Mode.SUBTRACT)

    # F14 (on face) → F15 (join)
    with BuildSketch(Plane(origin=(118.5131745475, 0, 0), x_dir=(0, -1, 0), z_dir=(-1, 0, 0))):
        with Locations((0, 42)):
            Circle(F14_R)
        with Locations((0, 42)):
            Circle(F14_R_2, mode=Mode.SUBTRACT)
    extrude(amount=F15_DEPTH)

    # F16
    f16_edges = [f7_1.edges().sort_by_distance(p)[0] for p in [
        (118.513175, 0, 49),
        (116.713175, 3.8, 42),
    ]]
    chamfer(f16_edges, length=F16_SIZE)


solid = Compound([f1.part, f7_1.part])
